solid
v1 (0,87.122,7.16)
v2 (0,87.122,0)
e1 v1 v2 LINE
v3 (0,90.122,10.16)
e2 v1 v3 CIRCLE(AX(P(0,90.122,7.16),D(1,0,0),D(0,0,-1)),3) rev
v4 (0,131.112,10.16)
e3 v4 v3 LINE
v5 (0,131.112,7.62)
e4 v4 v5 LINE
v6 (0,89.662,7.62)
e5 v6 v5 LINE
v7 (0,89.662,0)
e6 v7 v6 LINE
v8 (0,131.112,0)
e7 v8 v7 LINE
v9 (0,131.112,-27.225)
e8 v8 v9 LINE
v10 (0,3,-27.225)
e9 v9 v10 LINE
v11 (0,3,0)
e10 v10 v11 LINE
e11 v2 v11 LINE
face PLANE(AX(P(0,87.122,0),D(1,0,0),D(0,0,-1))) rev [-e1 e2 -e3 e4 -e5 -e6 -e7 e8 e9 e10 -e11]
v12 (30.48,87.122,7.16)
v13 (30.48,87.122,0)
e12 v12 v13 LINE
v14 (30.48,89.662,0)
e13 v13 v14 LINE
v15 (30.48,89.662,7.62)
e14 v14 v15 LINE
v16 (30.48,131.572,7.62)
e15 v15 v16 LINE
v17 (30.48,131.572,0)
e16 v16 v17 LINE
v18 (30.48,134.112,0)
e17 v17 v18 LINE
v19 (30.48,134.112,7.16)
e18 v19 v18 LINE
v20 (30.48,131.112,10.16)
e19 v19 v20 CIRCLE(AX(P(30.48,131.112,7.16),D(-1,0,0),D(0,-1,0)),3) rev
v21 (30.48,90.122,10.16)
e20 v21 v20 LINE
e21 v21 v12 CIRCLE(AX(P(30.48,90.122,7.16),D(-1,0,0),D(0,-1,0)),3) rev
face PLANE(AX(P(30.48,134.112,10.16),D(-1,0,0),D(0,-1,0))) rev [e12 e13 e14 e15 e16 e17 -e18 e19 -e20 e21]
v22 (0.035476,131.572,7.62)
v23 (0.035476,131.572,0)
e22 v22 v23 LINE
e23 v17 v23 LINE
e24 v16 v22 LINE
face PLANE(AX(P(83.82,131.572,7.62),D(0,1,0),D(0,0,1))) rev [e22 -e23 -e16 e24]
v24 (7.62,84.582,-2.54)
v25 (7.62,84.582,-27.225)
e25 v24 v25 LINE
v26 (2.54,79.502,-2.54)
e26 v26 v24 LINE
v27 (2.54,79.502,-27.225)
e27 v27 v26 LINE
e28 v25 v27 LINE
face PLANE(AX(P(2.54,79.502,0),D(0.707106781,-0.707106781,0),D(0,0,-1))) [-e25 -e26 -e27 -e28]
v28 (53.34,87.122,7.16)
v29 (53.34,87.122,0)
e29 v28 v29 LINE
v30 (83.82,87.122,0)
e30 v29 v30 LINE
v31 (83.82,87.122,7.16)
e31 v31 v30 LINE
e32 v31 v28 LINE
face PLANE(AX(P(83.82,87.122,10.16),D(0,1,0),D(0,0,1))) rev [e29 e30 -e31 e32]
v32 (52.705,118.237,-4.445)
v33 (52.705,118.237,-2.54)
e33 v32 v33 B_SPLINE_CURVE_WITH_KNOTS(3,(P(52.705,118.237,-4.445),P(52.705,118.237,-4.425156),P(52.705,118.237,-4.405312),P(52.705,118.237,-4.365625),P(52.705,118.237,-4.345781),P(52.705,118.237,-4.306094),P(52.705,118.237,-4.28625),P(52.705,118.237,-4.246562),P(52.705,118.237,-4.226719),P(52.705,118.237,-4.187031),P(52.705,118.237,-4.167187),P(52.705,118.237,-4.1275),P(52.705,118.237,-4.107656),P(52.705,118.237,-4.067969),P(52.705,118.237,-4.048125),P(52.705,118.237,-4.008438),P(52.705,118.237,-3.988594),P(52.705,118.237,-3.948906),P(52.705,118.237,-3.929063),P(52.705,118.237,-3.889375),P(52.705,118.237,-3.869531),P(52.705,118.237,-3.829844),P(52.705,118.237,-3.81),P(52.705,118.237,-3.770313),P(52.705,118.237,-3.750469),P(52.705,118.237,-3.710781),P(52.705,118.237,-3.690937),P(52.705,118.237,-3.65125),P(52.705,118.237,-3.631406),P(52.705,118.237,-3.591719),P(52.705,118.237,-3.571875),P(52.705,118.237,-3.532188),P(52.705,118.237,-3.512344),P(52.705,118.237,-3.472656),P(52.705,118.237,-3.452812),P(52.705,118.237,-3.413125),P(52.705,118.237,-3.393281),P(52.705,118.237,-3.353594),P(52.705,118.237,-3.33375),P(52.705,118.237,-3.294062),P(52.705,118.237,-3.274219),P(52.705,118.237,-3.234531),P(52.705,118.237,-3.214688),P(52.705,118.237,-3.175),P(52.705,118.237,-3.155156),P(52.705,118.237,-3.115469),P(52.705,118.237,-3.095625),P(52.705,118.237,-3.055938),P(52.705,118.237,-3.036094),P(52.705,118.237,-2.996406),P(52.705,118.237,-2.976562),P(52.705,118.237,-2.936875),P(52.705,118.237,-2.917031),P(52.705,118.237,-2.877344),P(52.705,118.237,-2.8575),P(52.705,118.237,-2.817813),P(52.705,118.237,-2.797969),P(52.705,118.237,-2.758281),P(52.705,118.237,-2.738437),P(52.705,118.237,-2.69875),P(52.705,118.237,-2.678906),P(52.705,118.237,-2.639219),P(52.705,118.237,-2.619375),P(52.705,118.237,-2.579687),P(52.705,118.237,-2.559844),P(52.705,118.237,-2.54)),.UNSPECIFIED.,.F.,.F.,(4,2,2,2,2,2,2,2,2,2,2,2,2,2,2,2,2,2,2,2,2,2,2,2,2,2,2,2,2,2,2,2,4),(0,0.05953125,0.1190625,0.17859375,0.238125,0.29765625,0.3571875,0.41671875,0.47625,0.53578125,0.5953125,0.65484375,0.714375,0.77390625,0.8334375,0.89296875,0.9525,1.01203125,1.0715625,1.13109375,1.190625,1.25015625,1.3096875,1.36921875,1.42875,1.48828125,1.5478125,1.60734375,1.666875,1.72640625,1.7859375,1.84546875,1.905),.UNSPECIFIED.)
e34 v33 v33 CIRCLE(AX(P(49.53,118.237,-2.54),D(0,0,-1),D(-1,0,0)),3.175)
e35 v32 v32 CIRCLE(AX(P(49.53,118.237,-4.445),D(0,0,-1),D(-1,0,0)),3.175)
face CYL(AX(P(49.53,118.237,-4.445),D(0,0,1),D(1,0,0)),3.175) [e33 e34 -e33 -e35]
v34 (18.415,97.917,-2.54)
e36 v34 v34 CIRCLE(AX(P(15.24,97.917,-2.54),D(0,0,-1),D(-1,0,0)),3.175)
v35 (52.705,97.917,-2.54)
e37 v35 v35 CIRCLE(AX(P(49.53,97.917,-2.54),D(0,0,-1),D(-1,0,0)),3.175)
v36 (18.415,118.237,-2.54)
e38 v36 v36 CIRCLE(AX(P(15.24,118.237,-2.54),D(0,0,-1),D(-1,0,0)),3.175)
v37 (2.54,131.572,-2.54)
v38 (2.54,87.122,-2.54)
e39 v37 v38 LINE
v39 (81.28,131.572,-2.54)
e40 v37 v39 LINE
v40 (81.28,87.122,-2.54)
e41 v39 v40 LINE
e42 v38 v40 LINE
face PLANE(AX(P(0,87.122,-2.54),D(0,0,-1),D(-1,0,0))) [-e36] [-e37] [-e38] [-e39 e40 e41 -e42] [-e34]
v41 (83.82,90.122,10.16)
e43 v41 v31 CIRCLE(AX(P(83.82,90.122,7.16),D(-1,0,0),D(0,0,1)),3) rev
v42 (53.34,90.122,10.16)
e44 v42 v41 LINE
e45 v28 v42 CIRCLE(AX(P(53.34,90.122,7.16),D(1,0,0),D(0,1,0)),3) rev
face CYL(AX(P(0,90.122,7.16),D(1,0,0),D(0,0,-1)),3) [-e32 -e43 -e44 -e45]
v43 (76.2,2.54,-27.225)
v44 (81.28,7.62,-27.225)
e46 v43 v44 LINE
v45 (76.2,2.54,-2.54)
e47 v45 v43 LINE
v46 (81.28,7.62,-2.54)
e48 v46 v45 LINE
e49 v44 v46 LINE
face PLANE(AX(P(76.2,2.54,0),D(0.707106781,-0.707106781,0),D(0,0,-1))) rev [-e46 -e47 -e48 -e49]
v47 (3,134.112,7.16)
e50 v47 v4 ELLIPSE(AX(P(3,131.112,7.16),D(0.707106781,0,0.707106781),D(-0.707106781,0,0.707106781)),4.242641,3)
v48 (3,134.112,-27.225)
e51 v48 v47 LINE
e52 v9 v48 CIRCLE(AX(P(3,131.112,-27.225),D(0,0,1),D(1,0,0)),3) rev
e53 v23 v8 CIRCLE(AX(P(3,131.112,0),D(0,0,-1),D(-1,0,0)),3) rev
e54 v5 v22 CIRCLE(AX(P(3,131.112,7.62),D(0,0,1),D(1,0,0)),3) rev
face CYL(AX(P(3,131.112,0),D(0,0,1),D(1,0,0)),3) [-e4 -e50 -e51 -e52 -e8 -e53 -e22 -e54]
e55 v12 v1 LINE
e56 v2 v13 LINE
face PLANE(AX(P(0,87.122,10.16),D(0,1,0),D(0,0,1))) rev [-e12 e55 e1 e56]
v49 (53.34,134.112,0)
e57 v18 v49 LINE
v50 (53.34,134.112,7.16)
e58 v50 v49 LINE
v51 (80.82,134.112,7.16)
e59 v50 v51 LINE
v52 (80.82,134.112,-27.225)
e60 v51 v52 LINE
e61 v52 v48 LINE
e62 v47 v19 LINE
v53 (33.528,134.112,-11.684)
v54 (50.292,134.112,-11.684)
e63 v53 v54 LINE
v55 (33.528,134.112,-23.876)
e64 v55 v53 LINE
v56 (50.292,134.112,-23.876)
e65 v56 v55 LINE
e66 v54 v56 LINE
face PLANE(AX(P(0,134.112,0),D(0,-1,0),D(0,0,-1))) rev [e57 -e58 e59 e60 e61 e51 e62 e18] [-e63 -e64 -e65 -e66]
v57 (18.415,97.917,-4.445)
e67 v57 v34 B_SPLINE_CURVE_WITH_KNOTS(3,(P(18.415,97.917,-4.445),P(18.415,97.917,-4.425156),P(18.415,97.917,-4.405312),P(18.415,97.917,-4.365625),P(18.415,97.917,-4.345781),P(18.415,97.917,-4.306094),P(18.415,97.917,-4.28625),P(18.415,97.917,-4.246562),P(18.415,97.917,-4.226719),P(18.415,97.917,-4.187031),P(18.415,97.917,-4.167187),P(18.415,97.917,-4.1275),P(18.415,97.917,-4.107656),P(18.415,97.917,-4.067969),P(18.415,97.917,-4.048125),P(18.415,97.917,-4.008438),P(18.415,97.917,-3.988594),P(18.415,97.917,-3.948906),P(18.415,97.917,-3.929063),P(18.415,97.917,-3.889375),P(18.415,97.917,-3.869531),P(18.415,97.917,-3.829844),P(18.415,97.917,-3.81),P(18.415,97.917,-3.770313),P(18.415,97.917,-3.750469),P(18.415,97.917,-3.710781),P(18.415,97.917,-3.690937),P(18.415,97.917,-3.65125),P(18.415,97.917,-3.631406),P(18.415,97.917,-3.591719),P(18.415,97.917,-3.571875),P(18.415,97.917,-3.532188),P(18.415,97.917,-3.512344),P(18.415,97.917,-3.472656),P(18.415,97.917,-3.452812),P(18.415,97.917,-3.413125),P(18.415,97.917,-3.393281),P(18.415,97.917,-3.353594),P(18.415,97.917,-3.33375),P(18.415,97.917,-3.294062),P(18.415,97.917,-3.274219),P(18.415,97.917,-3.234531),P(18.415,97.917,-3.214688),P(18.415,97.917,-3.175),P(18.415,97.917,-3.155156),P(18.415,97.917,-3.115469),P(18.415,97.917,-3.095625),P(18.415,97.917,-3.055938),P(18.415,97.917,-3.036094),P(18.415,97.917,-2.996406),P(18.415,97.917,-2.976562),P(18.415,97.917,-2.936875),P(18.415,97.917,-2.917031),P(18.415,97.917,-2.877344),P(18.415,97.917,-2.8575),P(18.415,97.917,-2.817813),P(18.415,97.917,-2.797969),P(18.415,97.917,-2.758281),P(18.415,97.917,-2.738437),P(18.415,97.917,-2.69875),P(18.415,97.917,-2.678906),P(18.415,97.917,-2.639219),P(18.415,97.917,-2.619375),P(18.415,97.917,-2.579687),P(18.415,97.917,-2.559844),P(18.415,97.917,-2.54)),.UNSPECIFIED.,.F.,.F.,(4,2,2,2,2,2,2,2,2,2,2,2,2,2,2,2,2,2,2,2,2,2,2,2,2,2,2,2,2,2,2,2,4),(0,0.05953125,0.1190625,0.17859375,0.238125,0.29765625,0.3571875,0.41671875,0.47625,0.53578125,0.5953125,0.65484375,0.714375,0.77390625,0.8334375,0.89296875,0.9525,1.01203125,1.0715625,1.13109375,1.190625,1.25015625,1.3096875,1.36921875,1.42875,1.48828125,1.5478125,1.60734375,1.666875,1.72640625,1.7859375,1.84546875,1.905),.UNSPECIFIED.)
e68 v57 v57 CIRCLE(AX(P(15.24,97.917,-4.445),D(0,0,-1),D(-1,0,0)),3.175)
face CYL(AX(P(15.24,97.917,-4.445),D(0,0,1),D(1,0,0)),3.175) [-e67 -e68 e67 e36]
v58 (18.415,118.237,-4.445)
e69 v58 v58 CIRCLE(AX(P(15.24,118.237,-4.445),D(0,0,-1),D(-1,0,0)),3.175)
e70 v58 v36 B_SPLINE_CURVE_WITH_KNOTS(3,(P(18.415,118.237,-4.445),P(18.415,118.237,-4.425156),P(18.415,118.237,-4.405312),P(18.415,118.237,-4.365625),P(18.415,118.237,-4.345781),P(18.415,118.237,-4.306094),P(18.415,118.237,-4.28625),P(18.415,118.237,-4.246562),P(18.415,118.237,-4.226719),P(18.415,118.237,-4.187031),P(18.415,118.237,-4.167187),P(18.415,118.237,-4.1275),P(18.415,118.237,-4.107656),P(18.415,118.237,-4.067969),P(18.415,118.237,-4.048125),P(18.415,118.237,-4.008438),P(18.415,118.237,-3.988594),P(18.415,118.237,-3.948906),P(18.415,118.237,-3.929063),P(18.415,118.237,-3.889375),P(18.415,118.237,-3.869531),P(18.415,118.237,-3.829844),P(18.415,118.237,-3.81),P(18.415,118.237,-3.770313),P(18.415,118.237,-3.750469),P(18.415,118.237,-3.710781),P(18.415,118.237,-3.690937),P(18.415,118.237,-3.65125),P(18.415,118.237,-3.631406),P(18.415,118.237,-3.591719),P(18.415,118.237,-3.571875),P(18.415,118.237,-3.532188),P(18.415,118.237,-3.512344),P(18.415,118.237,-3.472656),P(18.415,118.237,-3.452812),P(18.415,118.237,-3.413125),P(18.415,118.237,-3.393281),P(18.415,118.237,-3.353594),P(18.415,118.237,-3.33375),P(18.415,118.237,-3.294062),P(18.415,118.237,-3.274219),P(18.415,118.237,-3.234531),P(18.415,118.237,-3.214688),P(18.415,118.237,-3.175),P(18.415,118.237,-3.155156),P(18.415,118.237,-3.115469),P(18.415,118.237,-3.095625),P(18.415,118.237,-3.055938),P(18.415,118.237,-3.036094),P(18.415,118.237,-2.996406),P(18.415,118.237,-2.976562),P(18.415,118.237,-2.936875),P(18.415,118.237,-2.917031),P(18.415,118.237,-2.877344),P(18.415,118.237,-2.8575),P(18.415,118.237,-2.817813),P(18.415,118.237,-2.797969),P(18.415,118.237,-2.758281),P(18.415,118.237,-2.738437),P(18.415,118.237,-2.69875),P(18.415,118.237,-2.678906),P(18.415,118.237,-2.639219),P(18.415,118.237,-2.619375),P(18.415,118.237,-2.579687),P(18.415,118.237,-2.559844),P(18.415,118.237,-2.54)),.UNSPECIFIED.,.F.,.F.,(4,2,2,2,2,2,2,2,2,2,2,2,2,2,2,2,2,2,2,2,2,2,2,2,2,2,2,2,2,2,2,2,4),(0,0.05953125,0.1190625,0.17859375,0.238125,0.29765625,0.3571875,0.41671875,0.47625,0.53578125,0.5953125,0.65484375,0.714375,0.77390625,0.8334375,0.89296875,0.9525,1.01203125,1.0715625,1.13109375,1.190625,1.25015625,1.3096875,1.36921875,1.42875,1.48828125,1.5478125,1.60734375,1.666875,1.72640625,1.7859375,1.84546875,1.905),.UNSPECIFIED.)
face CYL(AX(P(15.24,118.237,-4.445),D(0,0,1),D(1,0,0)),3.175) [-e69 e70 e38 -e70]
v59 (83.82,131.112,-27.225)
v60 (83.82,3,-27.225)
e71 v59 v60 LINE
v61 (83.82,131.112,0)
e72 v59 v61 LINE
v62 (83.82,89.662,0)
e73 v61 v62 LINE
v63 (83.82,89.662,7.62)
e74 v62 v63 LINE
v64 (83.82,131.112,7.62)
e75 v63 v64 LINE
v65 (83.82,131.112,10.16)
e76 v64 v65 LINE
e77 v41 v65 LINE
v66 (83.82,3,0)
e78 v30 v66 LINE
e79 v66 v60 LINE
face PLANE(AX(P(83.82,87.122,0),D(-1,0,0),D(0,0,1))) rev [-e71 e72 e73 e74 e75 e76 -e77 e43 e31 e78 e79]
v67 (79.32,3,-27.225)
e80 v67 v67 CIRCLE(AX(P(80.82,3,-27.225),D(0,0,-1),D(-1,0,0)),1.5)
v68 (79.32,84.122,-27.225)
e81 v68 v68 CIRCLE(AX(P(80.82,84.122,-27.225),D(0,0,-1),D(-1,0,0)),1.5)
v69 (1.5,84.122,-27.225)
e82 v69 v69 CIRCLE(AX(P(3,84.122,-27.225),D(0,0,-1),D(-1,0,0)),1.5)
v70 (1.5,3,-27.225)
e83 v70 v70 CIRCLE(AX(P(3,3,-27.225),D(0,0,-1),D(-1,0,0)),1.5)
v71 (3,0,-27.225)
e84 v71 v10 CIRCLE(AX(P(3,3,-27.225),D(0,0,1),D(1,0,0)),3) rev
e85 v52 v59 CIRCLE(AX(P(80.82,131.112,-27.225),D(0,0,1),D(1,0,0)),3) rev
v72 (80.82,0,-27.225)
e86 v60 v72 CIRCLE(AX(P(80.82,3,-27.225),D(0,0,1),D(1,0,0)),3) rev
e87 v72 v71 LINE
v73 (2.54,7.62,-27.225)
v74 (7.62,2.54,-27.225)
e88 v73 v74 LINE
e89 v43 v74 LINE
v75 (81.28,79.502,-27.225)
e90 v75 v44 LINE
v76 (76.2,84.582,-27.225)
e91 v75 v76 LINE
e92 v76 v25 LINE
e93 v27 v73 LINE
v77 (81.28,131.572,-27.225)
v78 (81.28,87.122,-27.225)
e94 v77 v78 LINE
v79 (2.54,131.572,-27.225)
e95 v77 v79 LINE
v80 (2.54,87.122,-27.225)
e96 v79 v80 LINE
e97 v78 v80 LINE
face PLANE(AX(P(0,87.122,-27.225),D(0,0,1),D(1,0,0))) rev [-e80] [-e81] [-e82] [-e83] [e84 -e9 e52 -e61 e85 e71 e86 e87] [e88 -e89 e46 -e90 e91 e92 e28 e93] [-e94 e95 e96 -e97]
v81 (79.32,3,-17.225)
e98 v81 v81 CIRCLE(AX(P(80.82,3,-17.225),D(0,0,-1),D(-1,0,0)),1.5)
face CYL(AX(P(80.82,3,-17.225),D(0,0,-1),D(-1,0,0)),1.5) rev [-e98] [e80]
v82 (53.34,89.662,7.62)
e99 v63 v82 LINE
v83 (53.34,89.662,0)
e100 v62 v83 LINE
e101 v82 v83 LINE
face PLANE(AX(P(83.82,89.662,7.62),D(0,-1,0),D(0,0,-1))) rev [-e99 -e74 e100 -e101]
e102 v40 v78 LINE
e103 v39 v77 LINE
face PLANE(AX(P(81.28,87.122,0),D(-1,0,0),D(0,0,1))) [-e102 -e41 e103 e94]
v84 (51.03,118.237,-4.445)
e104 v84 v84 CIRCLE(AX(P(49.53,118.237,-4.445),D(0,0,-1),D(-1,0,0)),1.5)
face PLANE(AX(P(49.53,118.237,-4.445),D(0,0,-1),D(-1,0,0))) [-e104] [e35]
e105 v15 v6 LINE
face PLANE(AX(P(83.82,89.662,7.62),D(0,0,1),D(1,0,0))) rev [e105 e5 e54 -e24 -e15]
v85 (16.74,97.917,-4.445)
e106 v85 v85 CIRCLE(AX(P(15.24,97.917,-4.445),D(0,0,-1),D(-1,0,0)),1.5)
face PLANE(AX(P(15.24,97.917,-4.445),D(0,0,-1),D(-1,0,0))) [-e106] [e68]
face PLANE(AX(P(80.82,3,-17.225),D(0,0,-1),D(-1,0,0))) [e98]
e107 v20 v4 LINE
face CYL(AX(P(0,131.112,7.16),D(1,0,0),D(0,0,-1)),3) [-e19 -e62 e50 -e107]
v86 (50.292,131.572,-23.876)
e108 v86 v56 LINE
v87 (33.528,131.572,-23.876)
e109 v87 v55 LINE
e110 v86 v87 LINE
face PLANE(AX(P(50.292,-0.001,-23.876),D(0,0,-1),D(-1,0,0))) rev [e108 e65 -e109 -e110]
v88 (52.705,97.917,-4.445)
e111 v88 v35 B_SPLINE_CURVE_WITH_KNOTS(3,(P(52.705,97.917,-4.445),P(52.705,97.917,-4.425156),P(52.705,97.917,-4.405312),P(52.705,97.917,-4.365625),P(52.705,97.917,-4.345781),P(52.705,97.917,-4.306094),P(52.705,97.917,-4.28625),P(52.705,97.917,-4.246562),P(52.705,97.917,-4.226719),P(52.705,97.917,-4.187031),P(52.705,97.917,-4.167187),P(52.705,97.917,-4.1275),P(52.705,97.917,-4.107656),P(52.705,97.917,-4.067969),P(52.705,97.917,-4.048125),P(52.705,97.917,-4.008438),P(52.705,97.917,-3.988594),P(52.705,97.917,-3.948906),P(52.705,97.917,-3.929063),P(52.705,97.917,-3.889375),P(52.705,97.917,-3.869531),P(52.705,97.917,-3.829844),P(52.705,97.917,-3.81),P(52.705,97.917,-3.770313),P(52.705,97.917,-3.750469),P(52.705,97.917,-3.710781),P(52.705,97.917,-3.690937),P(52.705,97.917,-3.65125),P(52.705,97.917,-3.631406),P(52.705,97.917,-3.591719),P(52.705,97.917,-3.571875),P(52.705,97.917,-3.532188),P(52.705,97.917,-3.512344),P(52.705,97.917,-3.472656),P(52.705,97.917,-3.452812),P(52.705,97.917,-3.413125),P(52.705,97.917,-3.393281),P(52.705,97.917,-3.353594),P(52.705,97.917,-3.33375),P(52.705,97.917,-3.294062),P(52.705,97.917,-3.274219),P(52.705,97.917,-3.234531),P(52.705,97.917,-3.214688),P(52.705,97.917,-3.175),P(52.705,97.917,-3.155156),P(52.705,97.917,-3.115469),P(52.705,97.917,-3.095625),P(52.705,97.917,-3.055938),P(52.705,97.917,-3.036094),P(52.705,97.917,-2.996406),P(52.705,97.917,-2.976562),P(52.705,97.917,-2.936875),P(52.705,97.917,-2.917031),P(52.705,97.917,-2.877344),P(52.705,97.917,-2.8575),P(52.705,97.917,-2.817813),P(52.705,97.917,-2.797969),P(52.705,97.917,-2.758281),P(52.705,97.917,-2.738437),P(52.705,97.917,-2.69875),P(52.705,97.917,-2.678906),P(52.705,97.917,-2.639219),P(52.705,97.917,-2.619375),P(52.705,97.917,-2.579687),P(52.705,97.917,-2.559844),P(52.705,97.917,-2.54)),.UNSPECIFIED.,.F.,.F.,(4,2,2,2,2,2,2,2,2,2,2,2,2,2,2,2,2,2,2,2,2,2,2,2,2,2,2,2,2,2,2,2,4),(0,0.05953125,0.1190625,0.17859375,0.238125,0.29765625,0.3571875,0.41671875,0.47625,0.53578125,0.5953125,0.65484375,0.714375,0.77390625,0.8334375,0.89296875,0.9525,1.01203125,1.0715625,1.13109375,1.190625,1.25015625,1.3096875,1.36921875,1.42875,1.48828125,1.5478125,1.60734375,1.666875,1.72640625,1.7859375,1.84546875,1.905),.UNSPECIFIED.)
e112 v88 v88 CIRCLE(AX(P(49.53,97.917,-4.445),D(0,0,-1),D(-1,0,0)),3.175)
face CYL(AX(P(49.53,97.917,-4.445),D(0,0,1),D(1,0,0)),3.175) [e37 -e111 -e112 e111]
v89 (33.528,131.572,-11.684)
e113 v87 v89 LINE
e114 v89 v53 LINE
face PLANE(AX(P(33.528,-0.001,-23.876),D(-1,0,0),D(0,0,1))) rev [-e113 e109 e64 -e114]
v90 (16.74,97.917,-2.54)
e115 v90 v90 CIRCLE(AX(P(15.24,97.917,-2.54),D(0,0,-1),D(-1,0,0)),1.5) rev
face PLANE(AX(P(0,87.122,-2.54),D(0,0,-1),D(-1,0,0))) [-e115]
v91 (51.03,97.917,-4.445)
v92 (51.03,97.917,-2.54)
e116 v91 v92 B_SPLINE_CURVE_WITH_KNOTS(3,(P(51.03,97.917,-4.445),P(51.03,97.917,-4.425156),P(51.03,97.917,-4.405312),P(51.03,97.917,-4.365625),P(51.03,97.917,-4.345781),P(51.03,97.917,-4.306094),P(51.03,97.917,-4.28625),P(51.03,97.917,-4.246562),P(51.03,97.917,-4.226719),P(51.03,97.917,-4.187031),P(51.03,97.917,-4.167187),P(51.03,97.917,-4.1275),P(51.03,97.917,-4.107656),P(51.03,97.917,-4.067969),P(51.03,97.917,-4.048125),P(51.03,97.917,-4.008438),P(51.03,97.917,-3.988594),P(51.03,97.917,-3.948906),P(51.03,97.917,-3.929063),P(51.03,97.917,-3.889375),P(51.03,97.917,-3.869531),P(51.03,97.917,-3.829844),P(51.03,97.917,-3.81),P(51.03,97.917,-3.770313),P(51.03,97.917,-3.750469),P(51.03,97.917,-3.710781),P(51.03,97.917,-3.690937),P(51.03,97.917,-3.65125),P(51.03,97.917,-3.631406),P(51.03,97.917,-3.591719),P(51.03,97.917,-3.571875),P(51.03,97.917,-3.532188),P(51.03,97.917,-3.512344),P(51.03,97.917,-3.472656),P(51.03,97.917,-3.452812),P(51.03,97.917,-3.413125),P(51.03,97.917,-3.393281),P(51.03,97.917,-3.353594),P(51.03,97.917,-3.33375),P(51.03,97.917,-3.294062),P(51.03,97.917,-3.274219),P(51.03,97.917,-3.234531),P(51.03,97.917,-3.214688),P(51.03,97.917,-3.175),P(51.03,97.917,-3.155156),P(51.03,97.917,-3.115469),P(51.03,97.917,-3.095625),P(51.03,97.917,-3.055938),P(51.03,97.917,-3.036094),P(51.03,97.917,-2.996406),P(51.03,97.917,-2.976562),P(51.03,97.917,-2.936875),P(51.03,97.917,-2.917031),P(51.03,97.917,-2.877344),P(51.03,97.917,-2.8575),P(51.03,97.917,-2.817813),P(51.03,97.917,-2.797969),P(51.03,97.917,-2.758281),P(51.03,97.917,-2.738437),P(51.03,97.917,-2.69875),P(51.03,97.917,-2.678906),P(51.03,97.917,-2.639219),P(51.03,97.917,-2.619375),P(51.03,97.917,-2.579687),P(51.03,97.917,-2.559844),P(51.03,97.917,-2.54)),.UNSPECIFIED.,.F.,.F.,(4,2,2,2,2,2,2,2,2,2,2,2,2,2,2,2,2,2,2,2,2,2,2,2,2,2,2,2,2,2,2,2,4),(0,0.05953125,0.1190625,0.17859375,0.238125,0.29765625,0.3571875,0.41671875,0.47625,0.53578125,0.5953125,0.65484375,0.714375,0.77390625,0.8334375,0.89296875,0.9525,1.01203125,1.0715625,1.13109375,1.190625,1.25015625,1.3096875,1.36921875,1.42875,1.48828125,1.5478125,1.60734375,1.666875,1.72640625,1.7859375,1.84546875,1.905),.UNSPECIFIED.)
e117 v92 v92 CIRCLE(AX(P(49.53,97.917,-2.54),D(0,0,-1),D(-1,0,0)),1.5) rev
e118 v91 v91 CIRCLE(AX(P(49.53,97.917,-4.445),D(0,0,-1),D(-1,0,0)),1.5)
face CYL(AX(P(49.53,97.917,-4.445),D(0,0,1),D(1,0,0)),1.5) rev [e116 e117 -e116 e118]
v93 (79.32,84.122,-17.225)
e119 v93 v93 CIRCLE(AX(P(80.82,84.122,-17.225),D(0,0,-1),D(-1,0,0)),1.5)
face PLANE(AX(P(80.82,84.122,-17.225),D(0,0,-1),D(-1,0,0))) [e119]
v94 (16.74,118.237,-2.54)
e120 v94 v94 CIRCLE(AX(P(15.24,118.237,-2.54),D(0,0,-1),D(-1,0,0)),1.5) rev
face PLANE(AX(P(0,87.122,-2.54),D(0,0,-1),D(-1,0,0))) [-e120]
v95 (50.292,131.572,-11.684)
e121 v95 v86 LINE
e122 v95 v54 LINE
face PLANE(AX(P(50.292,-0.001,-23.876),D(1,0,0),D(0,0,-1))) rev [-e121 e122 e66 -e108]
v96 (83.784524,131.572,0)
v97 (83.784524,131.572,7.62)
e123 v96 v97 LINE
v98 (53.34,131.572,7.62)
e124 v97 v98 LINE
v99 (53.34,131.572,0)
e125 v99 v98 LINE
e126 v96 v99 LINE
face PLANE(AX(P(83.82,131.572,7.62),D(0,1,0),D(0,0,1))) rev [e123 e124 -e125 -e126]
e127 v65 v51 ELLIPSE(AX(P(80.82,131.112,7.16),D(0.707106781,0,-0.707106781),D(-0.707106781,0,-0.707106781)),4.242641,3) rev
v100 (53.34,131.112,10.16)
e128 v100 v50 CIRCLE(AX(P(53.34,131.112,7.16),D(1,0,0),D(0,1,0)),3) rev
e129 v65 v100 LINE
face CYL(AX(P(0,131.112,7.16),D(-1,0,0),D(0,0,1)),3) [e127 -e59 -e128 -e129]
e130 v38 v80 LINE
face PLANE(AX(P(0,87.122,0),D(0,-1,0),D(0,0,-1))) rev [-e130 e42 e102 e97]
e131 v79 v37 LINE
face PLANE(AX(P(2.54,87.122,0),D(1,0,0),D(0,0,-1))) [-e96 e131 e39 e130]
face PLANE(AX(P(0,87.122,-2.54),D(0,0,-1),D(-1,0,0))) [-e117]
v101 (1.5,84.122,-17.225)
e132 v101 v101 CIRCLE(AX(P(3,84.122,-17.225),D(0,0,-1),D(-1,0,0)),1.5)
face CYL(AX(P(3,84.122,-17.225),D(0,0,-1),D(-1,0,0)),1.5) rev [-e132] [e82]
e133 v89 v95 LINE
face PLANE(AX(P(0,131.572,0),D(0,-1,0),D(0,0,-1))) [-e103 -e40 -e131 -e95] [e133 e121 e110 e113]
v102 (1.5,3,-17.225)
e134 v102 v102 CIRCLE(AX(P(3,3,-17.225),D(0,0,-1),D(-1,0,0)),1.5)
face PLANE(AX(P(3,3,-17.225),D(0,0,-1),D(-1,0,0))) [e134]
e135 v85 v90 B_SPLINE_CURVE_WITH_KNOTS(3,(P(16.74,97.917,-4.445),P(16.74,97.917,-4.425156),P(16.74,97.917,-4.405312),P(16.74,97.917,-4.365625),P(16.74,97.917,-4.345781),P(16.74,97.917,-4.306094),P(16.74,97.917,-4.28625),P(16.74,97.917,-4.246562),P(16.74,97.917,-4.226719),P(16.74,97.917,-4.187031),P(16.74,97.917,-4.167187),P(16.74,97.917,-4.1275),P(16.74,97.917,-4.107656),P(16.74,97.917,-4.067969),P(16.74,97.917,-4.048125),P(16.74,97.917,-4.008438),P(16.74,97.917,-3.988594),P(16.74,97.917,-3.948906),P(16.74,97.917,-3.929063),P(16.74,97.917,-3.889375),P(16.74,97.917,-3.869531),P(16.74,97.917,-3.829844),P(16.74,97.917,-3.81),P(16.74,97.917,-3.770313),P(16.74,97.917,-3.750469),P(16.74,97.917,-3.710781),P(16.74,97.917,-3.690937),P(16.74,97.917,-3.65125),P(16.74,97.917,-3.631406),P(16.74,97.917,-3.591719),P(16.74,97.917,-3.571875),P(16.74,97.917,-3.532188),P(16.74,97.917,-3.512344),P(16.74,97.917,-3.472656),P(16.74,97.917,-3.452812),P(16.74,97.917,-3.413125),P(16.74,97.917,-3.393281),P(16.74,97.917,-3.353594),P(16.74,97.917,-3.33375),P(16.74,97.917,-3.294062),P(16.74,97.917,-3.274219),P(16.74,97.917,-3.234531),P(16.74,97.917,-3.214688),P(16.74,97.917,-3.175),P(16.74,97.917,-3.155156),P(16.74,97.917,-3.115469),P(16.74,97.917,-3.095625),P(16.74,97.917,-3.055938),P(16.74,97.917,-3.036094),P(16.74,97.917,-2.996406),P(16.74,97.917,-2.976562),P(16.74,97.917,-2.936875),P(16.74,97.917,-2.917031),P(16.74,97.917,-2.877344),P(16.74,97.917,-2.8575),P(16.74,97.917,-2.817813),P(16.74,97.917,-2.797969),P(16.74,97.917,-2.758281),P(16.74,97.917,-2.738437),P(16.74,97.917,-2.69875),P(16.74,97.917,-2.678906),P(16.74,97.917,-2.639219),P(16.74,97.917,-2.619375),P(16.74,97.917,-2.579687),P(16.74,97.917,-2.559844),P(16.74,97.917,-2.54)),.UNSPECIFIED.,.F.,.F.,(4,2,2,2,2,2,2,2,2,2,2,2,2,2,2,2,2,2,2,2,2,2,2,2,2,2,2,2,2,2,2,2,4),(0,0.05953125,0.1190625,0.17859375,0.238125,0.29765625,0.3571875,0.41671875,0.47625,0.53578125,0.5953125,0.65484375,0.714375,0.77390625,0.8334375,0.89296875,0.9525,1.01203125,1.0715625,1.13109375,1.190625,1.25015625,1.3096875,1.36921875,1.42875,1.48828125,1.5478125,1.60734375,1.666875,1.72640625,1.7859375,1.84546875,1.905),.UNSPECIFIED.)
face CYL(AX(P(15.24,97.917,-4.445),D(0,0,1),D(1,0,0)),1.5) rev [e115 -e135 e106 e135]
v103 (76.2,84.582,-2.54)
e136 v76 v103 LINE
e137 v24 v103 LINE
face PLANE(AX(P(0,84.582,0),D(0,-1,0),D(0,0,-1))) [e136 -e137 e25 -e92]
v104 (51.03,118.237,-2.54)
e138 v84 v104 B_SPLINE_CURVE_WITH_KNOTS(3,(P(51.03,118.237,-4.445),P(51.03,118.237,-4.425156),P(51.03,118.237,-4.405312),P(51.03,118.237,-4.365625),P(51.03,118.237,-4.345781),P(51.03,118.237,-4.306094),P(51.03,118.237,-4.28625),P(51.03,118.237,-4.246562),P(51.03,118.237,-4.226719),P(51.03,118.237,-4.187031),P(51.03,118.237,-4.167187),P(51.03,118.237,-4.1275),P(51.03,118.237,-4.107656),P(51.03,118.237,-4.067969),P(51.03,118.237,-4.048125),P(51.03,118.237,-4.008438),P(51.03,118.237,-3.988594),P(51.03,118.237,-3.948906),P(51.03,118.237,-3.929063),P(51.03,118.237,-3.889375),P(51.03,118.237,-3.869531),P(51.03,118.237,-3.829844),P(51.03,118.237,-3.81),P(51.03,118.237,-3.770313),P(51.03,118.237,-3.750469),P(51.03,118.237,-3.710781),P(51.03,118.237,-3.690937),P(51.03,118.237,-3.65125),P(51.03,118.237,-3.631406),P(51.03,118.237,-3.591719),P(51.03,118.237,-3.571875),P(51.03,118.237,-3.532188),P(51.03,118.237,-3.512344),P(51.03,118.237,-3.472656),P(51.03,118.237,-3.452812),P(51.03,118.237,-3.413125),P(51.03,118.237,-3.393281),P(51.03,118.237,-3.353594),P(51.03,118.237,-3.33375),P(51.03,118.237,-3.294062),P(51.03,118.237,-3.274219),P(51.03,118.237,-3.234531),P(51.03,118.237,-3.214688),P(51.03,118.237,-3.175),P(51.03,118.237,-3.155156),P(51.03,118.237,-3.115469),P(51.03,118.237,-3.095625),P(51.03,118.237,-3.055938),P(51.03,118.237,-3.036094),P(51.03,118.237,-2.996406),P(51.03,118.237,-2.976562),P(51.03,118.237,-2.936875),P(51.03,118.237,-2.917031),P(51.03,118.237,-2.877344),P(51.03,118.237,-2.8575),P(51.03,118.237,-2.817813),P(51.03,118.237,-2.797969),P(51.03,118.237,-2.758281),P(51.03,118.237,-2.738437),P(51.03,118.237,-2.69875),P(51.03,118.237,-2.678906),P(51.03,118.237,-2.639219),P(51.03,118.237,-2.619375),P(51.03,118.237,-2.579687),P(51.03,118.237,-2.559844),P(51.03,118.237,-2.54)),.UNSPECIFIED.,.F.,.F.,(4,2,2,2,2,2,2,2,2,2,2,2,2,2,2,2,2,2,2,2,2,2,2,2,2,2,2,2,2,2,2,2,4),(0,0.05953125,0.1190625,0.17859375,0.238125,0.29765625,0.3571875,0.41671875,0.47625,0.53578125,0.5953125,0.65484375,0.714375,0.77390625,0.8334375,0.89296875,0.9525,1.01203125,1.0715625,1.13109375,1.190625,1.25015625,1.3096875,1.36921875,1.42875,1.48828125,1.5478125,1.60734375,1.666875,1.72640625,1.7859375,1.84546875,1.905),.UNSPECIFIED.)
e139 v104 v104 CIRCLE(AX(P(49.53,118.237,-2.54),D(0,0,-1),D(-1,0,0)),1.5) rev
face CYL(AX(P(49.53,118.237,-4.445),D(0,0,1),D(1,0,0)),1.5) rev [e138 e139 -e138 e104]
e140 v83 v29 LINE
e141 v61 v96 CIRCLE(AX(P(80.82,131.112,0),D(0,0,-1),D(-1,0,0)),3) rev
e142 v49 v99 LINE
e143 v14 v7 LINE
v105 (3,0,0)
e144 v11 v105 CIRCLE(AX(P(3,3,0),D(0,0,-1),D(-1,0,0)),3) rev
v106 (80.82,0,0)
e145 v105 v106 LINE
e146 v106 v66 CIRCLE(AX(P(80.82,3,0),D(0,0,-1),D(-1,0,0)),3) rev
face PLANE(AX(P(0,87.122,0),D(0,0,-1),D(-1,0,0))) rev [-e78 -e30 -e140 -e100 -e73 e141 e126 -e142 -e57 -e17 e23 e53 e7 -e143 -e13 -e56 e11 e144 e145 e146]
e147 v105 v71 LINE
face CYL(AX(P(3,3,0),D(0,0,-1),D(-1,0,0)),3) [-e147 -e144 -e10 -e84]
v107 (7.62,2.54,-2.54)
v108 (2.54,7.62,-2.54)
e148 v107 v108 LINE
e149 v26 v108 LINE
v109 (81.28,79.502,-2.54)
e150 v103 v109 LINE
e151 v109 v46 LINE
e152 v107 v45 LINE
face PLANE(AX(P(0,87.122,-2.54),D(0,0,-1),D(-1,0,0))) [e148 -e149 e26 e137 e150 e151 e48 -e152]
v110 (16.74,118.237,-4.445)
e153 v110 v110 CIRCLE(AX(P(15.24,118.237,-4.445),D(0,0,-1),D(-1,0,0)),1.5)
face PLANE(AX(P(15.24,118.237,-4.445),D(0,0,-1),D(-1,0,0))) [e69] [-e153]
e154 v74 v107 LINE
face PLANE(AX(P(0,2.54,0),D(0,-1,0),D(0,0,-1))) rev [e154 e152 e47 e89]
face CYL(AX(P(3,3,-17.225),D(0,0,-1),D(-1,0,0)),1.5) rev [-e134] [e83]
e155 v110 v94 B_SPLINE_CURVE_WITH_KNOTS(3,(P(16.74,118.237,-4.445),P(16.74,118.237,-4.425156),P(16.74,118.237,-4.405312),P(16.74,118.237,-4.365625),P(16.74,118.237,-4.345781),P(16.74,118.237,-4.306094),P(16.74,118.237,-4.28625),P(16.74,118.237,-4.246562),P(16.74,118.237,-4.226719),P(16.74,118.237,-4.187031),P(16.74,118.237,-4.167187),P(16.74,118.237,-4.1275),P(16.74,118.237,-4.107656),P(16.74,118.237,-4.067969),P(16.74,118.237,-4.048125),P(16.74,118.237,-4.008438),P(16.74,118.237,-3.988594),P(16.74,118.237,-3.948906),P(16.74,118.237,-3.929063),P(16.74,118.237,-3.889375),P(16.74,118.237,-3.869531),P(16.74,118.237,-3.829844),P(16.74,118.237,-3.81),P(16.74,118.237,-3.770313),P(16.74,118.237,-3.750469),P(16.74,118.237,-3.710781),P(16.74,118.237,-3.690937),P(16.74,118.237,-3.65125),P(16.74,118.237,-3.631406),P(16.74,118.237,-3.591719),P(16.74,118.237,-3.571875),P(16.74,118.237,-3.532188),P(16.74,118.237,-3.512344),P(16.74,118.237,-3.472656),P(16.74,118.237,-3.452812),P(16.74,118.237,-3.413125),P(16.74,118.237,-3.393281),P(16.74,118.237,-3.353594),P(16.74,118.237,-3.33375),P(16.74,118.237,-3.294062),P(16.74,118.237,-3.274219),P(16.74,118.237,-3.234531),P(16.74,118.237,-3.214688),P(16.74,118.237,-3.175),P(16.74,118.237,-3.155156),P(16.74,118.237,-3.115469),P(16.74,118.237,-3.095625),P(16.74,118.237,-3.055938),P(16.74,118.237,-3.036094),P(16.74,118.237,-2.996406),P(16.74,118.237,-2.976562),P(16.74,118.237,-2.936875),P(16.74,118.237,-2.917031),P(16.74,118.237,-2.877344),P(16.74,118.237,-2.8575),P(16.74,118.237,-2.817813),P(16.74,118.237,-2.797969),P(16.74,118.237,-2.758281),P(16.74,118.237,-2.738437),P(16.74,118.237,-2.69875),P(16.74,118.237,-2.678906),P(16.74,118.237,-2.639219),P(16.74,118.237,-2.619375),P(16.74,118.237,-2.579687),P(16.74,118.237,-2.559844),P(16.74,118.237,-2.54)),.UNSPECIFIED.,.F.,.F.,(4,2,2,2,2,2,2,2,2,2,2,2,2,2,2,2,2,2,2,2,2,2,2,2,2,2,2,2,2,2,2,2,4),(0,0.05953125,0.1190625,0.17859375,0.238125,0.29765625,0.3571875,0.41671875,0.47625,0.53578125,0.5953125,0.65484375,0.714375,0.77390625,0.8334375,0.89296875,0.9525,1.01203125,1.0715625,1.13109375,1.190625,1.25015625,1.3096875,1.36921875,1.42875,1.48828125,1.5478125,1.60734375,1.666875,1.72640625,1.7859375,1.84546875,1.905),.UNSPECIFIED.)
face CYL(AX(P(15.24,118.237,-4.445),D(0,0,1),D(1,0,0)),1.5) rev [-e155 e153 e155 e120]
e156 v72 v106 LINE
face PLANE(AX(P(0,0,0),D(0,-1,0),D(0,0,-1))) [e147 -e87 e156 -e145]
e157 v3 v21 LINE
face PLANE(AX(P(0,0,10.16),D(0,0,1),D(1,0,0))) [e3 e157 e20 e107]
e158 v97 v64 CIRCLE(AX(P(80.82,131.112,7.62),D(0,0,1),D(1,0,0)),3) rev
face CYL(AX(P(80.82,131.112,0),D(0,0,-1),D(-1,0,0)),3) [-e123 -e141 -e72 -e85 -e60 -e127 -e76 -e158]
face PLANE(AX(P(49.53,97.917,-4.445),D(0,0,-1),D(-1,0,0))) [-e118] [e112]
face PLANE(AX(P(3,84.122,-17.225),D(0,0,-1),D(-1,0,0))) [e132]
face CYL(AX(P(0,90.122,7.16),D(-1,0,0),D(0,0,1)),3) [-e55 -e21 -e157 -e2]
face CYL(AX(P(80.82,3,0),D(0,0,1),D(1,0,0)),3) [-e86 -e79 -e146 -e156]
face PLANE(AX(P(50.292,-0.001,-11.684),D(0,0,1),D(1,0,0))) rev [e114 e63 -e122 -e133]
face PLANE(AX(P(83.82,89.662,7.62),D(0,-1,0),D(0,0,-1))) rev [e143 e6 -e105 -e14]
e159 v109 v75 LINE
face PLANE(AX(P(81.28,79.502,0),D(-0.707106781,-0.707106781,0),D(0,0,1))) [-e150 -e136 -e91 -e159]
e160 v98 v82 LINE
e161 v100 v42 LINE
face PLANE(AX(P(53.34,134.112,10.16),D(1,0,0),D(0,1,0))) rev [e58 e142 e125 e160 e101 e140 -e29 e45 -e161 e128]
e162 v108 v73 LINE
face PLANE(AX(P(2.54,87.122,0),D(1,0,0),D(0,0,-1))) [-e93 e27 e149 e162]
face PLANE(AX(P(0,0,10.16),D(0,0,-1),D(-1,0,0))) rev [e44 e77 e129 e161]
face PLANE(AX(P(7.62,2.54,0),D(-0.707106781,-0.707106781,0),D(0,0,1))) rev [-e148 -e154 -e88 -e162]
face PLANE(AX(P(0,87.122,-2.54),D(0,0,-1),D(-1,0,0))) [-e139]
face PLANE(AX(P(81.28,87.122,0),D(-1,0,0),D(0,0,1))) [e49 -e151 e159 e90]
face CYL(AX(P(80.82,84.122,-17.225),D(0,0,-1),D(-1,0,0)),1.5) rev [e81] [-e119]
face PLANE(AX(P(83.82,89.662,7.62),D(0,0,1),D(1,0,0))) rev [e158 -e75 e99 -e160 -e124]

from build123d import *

# Parameters (mm, degrees)
SKETCH1_W           = 83.82
SKETCH1_H           = 27.225
BOSS_EXTRUDE1_DEPTH = 87.122
SHELL1_T            = -2.54
SKETCH12_W          = 83.82
SKETCH12_H          = 27.225
BOSS_EXTRUDE6_DEPTH = 46.99
SHELL2_START        = 2.54
SHELL2_OUTLINE_W    = 44.45
SHELL2_OUTLINE_H    = 24.685
SHELL2_DEPTH        = 78.74
SKETCH5_R           = 3.175
SKETCH5_R_2         = 1.5
BOSS_EXTRUDE7_DEPTH = 1.905
CUT_EXTRUDE10_REACH = 162.477
SKETCH14_W          = 16.764
SKETCH14_H          = 12.192
SKETCH15_W          = 30.48
SKETCH15_H          = 46.99
BOSS_EXTRUDE8_DEPTH = 10.16
SKETCH16_W          = 7.62
SKETCH16_H          = 41.91
CUT_EXTRUDE11_DEPTH = 161.477479943
CHAMFER1_SIZE       = 5.08
SKETCH17_R          = 1.5
CUT_EXTRUDE12_DEPTH = 10
FILLET1_R           = 3


# Read off the part's stored shape, not the designer's step: Shell2
with BuildPart() as part:
    # Sketch1 → Boss-Extrude1 (new body)
    with BuildSketch(Plane(origin=(0, 0, 0), x_dir=(1, 0, 0), z_dir=(0, 1, 0))):
        with Locations((41.91, 13.6125)):
            Rectangle(SKETCH1_W, SKETCH1_H)
    extrude(amount=BOSS_EXTRUDE1_DEPTH)

    # Shell1
    shell1_openings = [part.faces().sort_by_distance(p)[0] for p in [
        (41.91, 43.561, -27.225),
    ]]
    offset(amount=SHELL1_T, openings=shell1_openings, kind=Kind.INTERSECTION)

    # Sketch12 → Boss-Extrude6 (add)
    with BuildSketch(Plane(origin=(0, 87.122, 0), x_dir=(1, 0, 0), z_dir=(0, 1, 0))):
        with Locations((41.91, 13.6125)):
            Rectangle(SKETCH12_W, SKETCH12_H)
    extrude(amount=BOSS_EXTRUDE6_DEPTH)

    # Shell2 outline → Shell2 (cut)
    with BuildSketch(Plane.YZ.offset(SHELL2_START)):
        with Locations((109.347, -14.8825)):
            Rectangle(SHELL2_OUTLINE_W, SHELL2_OUTLINE_H)
    extrude(amount=SHELL2_DEPTH, mode=Mode.SUBTRACT)

    # Sketch5 → Boss-Extrude7 (add)
    # profile 1 of 4: a face of its own
    with BuildSketch(Plane(origin=(0, 88.392, -2.54), x_dir=(1, 0, 0), z_dir=(0, 0, -1))):
        with Locations((15.24, -29.845)):
            Circle(SKETCH5_R)
        with Locations((15.24, -29.845)):
            Circle(SKETCH5_R_2, mode=Mode.SUBTRACT)
    # profile 2 of 4: a face of its own
    with BuildSketch(Plane(origin=(0, 88.392, -2.54), x_dir=(1, 0, 0), z_dir=(0, 0, -1))):
        with Locations((15.24, -9.525)):
            Circle(SKETCH5_R)
        with Locations((15.24, -9.525)):
            Circle(SKETCH5_R_2, mode=Mode.SUBTRACT)
    # profile 3 of 4: a face of its own
    with BuildSketch(Plane(origin=(0, 88.392, -2.54), x_dir=(1, 0, 0), z_dir=(0, 0, -1))):
        with Locations((49.53, -9.525)):
            Circle(SKETCH5_R)
        with Locations((49.53, -9.525)):
            Circle(SKETCH5_R_2, mode=Mode.SUBTRACT)
    # profile 4 of 4: a face of its own
    with BuildSketch(Plane(origin=(0, 88.392, -2.54), x_dir=(1, 0, 0), z_dir=(0, 0, -1))):
        with Locations((49.53, -29.845)):
            Circle(SKETCH5_R)
        with Locations((49.53, -29.845)):
            Circle(SKETCH5_R_2, mode=Mode.SUBTRACT)
    extrude(amount=BOSS_EXTRUDE7_DEPTH)

    # Sketch14 → Cut-Extrude10 (cut, up to next)
    with BuildSketch(Plane(origin=(0, 134.112, 0), x_dir=(1, 0, 0), z_dir=(0, 1, 0)), mode=Mode.PRIVATE) as cut_extrude10_sk1:
        with Locations((41.91, 17.78)):
            Rectangle(SKETCH14_W, SKETCH14_H)
    cut_extrude10_tool1 = extrude(cut_extrude10_sk1.sketch, amount=-CUT_EXTRUDE10_REACH, mode=Mode.PRIVATE) & part.part
    add(cut_extrude10_tool1.solids().sort_by_distance((41.91, 134.112, -17.78))[0], mode=Mode.SUBTRACT)

    # Sketch15 → Boss-Extrude8 (add)
    with BuildSketch(Plane.XY):
        with Locations((15.24, 110.617)):
            Rectangle(SKETCH15_W, SKETCH15_H)
        with Locations((68.58, 110.617)):
            Rectangle(SKETCH15_W, SKETCH15_H)
    extrude(amount=BOSS_EXTRUDE8_DEPTH)

    # Sketch16 → Cut-Extrude11 (cut, through all)
    with BuildSketch(Plane.ZY):
        with Locations((3.81, 110.617)):
            Rectangle(SKETCH16_W, SKETCH16_H)
    extrude(amount=-CUT_EXTRUDE11_DEPTH, mode=Mode.SUBTRACT)

    # Chamfer1
    chamfer1_edges = [part.edges().sort_by_distance(p)[0] for p in [
        (2.54, 2.54, -14.8825),
        (81.28, 2.54, -14.8825),
        (2.54, 84.582, -14.8825),
        (81.28, 84.582, -14.8825),
    ]]
    chamfer(chamfer1_edges, length=CHAMFER1_SIZE)

    # Sketch17 → Cut-Extrude12 (cut)
    with BuildSketch(Plane(origin=(0, 0, -27.225), x_dir=(-1, 0, 0), z_dir=(0, 0, -1))):
        with Locations((-3, 84.122)):
            Circle(SKETCH17_R)
        with Locations((-80.82, 84.122)):
            Circle(SKETCH17_R)
        with Locations((-80.82, 3)):
            Circle(SKETCH17_R)
        with Locations((-3, 3)):
            Circle(SKETCH17_R)
    extrude(amount=-CUT_EXTRUDE12_DEPTH, mode=Mode.SUBTRACT)

    # Fillet1
    # the kernel refuses this fillet: 3 mm, written as the material it takes off along each edge
    with BuildSketch(Plane(origin=(91.32, 134.112, 10.16), x_dir=(0, 0, -1), z_dir=(-1, 0, 0)), Plane(origin=(45.84, 87.122, 10.16), x_dir=(0, 0, -1), z_dir=(1, 0, 0)), Plane(origin=(37.98, 87.122, 10.16), x_dir=(0, 1, 0), z_dir=(-1, 0, 0))) as fillet1_piece_1:
        with BuildLine():
            CenterArc((FILLET1_R, FILLET1_R), FILLET1_R, 180, 90)
            Line((0, FILLET1_R), (0, 0))
            Line((0, 0), (FILLET1_R, 0))
        make_face()
    extrude(amount=45.48, mode=Mode.SUBTRACT)
    with BuildSketch(Plane(origin=(-7.5, 134.112, 10.16), x_dir=(0, 0, -1), z_dir=(1, 0, 0))) as fillet1_piece_2:
        with BuildLine():
            CenterArc((FILLET1_R, -FILLET1_R), FILLET1_R, 90, 90)
            Line((0, -FILLET1_R), (0, 0))
            Line((0, 0), (FILLET1_R, 0))
        make_face()
    extrude(amount=45.48, mode=Mode.SUBTRACT)
    with BuildSketch(Plane(origin=(83.82, 134.112, -34.725), x_dir=(0, -1, 0), z_dir=(0, 0, 1))) as fillet1_piece_3:
        with BuildLine():
            CenterArc((FILLET1_R, -FILLET1_R), FILLET1_R, 90, 90)
            Line((0, -FILLET1_R), (0, 0))
            Line((0, 0), (FILLET1_R, 0))
        make_face()
    extrude(amount=52.385, mode=Mode.SUBTRACT)
    with BuildSketch(Plane(origin=(83.82, 0, 7.5), x_dir=(0, 1, 0), z_dir=(0, 0, -1))) as fillet1_piece_4:
        with BuildLine():
            CenterArc((FILLET1_R, -FILLET1_R), FILLET1_R, 90, 90)
            Line((0, -FILLET1_R), (0, 0))
            Line((0, 0), (FILLET1_R, 0))
        make_face()
    extrude(amount=42.225, mode=Mode.SUBTRACT)
    with BuildSketch(Plane(origin=(0, 0, -34.725), x_dir=(1, 0, 0), z_dir=(0, 0, 1))) as fillet1_piece_5:
        with BuildLine():
            CenterArc((FILLET1_R, FILLET1_R), FILLET1_R, 180, 90)
            Line((0, FILLET1_R), (0, 0))
            Line((0, 0), (FILLET1_R, 0))
        make_face()
    extrude(amount=42.225, mode=Mode.SUBTRACT)
    with BuildSketch(Plane(origin=(0, 134.112, 17.66), x_dir=(1, 0, 0), z_dir=(0, 0, -1))) as fillet1_piece_6:
        with BuildLine():
            CenterArc((FILLET1_R, FILLET1_R), FILLET1_R, 180, 90)
            Line((0, FILLET1_R), (0, 0))
            Line((0, 0), (FILLET1_R, 0))
        make_face()
    extrude(amount=52.385, mode=Mode.SUBTRACT)


solid = part.part
